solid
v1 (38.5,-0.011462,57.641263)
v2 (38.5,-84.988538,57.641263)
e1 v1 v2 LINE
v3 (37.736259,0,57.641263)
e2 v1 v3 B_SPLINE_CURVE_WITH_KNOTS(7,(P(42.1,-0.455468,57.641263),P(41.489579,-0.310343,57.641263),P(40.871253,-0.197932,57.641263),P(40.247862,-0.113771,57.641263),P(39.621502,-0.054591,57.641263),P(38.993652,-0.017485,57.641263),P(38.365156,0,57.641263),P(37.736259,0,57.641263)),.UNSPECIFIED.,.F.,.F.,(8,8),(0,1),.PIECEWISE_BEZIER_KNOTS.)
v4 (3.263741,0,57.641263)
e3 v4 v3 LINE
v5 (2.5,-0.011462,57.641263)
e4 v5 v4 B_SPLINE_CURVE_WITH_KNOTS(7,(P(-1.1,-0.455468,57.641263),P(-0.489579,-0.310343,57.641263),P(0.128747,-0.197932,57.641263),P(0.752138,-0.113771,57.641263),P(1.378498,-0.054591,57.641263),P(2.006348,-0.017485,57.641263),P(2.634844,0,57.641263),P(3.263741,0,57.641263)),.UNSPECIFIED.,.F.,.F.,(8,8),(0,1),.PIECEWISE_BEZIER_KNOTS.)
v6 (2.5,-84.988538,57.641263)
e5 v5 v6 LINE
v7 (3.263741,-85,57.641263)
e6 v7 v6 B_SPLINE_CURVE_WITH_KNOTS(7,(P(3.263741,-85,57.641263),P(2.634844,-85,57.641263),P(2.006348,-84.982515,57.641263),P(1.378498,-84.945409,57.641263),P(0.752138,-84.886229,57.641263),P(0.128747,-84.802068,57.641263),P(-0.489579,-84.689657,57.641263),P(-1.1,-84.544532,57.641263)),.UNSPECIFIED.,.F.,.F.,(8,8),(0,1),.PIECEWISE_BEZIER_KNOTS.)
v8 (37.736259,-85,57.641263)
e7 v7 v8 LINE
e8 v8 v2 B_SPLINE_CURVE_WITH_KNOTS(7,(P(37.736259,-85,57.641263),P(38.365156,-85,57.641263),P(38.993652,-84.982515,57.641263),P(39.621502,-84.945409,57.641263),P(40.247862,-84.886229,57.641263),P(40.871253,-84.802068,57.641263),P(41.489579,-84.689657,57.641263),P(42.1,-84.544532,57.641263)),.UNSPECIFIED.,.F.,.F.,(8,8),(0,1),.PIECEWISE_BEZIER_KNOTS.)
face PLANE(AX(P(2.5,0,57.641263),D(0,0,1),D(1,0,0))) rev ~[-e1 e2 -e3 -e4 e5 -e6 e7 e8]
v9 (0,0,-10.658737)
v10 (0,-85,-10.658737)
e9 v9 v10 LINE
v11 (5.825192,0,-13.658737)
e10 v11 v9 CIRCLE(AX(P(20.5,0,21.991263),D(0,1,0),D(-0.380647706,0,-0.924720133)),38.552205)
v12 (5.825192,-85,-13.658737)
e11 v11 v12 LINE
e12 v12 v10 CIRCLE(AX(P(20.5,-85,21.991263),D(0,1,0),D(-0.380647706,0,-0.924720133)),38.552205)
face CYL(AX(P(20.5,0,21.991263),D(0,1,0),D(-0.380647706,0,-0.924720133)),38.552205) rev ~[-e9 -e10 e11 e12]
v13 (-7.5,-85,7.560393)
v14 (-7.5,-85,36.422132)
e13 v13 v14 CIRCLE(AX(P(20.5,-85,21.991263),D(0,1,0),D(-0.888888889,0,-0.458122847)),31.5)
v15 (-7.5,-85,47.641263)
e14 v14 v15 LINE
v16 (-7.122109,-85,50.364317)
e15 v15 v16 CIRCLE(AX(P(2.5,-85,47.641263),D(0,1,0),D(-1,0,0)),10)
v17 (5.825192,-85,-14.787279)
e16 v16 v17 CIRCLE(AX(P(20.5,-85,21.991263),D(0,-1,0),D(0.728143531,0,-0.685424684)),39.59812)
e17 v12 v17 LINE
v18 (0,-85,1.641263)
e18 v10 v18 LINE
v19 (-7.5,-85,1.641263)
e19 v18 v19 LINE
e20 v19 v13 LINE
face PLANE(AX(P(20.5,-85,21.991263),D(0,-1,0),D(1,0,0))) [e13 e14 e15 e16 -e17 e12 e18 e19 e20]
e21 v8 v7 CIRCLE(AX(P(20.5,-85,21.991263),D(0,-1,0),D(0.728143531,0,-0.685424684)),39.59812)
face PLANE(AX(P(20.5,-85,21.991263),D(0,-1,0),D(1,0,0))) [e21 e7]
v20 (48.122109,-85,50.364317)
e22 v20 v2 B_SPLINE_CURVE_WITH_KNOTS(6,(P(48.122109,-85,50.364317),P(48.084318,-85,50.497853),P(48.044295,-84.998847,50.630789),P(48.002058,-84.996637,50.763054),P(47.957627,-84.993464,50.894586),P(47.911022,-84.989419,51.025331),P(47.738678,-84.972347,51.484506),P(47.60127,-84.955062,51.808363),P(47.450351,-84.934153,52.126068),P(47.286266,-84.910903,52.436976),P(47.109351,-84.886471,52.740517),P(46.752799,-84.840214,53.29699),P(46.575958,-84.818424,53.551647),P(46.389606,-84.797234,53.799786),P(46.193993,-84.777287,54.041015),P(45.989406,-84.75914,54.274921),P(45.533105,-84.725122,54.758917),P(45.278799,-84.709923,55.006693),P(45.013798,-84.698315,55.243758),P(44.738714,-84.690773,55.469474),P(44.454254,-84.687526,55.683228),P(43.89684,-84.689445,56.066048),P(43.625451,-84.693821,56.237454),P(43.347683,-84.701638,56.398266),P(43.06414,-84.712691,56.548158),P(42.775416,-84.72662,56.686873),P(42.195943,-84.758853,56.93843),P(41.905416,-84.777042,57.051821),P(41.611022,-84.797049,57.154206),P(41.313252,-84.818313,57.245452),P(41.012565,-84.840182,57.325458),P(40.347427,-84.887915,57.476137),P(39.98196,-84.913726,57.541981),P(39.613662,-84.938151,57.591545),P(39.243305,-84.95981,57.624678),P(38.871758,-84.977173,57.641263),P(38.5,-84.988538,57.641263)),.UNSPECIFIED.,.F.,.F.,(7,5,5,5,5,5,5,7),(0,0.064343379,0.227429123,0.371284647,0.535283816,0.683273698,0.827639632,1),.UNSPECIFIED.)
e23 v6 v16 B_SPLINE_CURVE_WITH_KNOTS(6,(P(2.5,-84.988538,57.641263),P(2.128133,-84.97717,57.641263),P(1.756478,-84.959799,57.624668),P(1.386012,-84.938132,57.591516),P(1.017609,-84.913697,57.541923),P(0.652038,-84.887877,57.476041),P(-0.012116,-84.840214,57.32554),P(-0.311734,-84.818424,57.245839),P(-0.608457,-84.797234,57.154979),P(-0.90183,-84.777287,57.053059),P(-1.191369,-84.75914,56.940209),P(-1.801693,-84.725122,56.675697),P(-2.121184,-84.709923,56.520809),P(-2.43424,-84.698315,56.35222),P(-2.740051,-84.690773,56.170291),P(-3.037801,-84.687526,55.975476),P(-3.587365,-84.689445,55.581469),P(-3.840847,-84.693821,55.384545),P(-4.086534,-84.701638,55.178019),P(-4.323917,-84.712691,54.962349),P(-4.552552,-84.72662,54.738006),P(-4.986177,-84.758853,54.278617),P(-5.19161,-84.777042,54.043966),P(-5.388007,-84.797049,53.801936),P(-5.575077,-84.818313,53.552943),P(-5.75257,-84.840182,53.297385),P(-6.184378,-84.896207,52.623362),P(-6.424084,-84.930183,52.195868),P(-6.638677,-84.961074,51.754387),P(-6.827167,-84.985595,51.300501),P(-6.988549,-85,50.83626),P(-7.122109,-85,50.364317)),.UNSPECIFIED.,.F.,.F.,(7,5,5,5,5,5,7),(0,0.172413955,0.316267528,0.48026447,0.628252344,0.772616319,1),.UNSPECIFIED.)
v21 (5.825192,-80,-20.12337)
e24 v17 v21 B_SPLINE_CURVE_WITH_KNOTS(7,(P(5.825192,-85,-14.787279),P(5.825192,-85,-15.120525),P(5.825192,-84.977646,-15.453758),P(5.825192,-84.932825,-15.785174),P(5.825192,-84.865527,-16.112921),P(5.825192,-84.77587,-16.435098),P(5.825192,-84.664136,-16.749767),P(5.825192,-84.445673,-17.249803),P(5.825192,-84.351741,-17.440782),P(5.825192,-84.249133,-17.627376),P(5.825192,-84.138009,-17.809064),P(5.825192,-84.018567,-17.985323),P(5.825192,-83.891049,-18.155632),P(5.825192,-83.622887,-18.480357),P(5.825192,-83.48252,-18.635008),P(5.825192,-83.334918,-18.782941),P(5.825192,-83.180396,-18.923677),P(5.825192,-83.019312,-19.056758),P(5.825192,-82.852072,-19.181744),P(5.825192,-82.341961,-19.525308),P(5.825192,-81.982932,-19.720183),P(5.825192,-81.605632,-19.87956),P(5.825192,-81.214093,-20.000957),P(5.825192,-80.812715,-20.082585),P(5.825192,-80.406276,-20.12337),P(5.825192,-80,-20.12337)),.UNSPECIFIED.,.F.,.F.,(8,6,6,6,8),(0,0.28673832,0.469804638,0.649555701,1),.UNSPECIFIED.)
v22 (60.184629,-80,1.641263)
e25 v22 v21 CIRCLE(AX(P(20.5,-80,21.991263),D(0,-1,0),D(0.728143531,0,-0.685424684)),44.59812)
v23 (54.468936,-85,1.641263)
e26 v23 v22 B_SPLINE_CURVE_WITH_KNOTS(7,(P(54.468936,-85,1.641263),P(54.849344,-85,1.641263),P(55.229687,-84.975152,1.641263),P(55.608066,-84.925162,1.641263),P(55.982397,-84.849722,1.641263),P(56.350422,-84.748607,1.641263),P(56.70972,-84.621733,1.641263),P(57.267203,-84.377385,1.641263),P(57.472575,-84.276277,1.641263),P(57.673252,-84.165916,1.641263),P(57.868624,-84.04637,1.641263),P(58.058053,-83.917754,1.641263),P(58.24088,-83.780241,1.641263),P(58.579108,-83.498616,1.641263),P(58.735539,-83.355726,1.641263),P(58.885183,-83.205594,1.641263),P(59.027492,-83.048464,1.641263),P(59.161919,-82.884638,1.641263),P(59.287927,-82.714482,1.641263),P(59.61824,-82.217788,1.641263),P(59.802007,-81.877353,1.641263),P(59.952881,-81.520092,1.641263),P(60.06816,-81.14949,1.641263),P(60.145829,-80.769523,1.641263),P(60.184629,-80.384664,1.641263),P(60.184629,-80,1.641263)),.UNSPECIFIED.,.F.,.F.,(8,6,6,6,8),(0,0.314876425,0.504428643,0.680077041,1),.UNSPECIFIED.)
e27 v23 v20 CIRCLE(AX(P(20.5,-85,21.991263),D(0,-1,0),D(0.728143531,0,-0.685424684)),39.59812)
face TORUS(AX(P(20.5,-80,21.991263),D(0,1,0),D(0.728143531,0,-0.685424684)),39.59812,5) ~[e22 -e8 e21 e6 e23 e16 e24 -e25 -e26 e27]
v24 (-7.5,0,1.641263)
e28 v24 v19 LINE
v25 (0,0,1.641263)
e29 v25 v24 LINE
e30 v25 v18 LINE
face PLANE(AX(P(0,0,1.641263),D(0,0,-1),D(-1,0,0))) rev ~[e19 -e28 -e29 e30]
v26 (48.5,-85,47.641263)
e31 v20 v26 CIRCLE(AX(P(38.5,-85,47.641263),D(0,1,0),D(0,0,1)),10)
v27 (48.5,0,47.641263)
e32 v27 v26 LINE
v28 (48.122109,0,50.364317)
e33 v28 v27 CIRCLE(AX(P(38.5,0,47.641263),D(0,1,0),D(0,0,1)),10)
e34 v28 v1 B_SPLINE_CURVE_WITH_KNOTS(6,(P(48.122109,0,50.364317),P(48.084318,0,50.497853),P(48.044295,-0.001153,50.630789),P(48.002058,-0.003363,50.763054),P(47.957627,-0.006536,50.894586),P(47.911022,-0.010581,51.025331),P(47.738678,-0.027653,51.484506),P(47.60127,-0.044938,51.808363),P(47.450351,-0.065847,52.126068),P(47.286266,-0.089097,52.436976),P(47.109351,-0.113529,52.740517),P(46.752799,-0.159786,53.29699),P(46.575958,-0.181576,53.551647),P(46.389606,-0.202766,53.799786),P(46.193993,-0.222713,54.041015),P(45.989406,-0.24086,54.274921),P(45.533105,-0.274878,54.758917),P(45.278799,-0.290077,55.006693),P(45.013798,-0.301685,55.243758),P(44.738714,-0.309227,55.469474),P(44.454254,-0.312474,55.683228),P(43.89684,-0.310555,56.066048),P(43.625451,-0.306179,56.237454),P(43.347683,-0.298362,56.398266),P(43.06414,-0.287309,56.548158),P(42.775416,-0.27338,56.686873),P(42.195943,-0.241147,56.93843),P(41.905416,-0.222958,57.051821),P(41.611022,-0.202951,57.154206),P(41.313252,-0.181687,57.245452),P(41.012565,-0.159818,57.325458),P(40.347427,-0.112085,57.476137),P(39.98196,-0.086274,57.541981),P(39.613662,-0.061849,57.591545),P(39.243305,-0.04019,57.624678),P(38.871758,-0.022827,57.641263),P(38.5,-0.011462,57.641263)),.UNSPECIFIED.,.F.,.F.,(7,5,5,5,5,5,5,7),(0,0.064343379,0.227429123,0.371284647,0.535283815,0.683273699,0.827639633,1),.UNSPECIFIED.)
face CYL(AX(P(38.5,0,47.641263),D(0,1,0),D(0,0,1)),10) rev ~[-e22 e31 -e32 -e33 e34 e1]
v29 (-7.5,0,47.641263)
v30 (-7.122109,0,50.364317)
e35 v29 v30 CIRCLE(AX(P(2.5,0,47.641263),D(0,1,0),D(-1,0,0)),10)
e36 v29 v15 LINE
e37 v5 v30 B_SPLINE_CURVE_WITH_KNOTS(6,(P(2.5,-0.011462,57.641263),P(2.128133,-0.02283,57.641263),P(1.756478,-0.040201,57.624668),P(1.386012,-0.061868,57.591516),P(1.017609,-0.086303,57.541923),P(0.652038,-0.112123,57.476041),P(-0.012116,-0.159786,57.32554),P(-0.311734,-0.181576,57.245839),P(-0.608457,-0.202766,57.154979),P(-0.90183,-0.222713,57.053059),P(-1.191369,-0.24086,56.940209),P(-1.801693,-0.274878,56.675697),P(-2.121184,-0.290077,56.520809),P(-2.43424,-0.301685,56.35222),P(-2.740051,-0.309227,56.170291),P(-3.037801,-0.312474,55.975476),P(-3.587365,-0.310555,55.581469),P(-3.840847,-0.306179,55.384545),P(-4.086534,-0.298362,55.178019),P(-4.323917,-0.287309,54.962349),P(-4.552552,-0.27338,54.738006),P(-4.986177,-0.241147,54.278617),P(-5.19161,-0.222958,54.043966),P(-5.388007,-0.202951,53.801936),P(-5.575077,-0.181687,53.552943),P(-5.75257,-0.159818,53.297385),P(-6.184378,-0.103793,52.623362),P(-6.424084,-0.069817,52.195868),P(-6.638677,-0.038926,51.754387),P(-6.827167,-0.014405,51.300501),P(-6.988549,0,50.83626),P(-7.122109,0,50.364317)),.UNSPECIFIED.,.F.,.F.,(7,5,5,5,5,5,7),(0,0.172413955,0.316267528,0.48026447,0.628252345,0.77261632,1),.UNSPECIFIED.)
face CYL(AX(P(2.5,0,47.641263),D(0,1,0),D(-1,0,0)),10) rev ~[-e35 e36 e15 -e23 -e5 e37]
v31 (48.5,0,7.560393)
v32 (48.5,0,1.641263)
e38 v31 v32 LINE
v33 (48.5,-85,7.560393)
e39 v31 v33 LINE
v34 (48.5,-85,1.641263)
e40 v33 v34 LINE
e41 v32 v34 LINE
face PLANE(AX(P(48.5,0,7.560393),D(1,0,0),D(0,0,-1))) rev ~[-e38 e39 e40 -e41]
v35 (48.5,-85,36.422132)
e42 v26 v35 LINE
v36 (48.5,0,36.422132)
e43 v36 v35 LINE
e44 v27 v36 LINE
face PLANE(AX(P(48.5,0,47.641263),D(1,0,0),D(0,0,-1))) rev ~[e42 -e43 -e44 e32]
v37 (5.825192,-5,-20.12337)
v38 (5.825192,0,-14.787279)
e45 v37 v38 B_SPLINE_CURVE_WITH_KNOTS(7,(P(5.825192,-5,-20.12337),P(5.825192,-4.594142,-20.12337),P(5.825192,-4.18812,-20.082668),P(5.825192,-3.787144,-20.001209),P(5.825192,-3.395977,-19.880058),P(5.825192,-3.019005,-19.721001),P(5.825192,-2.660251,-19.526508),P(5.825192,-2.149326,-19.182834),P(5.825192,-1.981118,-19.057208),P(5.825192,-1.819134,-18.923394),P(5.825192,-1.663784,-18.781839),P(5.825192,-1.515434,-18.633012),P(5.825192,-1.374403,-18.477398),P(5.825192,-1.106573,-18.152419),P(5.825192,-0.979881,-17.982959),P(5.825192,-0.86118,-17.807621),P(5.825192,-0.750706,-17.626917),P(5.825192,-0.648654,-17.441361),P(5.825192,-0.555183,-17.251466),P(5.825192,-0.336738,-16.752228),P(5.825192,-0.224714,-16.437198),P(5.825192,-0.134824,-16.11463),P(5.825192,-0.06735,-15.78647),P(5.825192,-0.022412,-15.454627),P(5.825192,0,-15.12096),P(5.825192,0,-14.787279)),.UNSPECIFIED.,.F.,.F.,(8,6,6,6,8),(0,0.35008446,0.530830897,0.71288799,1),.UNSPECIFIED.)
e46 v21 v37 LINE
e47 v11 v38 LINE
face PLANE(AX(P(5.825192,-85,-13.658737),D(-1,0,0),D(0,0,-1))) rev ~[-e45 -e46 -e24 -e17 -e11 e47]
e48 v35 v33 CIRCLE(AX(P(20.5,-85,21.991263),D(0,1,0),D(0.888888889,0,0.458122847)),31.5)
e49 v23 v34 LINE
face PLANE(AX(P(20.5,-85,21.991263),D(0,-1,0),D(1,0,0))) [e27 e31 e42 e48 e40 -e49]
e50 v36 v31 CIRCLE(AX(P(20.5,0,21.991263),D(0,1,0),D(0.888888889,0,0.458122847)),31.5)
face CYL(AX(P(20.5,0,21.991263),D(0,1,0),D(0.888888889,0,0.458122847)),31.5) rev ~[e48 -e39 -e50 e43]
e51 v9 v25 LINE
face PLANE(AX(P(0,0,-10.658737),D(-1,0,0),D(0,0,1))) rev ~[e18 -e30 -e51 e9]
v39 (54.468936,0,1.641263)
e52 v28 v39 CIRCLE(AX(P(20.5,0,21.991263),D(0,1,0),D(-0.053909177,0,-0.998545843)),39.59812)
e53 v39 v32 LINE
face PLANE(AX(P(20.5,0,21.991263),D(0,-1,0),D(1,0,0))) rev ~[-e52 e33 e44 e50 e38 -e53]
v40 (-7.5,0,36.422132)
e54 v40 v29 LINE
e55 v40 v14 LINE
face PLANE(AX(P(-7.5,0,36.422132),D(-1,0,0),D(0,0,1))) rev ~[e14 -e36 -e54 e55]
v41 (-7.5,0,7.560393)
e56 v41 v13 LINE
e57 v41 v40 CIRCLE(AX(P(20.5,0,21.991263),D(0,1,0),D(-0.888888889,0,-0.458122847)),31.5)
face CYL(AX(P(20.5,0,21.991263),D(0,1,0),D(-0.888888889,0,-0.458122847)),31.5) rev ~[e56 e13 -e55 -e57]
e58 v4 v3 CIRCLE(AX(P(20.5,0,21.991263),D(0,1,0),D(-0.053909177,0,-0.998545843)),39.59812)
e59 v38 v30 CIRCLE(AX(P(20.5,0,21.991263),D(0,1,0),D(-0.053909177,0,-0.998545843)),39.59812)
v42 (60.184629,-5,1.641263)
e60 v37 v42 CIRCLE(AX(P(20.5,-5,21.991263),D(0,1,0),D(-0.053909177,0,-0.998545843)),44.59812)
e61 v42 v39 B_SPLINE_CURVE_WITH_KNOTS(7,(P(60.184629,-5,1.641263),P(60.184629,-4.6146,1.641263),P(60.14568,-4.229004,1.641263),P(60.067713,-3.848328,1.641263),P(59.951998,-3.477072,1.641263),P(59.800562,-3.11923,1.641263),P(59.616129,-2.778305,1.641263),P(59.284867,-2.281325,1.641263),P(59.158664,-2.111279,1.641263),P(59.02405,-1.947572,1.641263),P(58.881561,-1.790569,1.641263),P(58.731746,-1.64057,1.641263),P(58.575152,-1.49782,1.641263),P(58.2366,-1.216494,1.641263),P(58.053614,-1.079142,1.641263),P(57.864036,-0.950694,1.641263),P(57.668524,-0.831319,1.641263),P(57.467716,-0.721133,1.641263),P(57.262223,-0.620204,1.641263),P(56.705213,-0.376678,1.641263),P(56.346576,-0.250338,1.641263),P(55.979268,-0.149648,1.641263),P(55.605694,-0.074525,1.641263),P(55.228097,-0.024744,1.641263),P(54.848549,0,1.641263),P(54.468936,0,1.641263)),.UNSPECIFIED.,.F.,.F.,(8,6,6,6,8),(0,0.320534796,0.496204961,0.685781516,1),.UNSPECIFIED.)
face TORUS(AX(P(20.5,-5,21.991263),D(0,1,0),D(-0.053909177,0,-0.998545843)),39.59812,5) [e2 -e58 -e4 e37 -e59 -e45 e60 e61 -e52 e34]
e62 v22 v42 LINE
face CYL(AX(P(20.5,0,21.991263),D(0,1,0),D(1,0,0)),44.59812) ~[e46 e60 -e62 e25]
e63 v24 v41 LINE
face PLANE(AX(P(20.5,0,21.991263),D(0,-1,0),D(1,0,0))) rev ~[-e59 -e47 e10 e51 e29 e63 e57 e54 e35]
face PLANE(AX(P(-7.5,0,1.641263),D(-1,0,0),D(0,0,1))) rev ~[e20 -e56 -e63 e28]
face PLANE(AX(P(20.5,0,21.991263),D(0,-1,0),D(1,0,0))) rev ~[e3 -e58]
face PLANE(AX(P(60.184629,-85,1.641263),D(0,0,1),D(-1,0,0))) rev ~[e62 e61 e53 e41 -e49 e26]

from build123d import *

# Parameters (mm, degrees)
F0_R        = 44.59812
F1_DEPTH    = 85
F3_DEPTH    = 85.001
F4_T2_ANGLE = 310.1787489512
F4_T4_ANGLE = 310.1787489512


# Not quite as in the source:
# - a fillet or chamfer that OpenCascade refuses, or shapes differently, is made with other operations: its cross-section is extruded or revolved along the edge and cut away or added


with BuildPart() as f1:
    # F0 (on Front) → F1 (new body)
    with BuildSketch(Plane.XZ):
        with Locations((20.5, 21.991262728)):
            Circle(F0_R)
        with BuildLine():
            ThreePointArc((62.0981215365, 21.991262728), (57.0788738932, 2.1824338865), (43.2323802204, -12.8461109515))
            ThreePointArc((43.2323802204, -12.8461109515), (-16.0788738932, 41.8000915695), (62.0981215365, 21.991262728))
        make_face(mode=Mode.SUBTRACT)
        with BuildLine():
            ThreePointArc((62.0981215365, 21.991262728), (-16.0788738932, 41.8000915695), (43.2323802204, -12.8461109515))
            ThreePointArc((43.2323802204, -12.8461109515), (57.0788738932, 2.1824338865), (62.0981215365, 21.991262728))
        make_face()
        with BuildLine():
            Line((48.5, 7.5603930383), (48.5, 1.641262728))
            Line((48.5, 1.641262728), (45.5, 1.641262728))
            Line((45.5, 1.641262728), (45.5, -8.658737272))
            ThreePointArc((45.5, -8.658737272), (44.896697687, -11.0397138467), (43.2323802204, -12.8461109515))
            ThreePointArc((43.2323802204, -12.8461109515), (41.9253300675, -13.4512767031), (40.5, -13.658737272))
            Line((40.5, -13.658737272), (5.8251916537, -13.658737272))
            ThreePointArc((5.8251916537, -13.658737272), (2.8487454964, -12.2827174093), (0, -10.658737272))
            Line((0, -10.658737272), (0, 1.641262728))
            Line((0, 1.641262728), (-7.5, 1.641262728))
            Line((-7.5, 1.641262728), (-7.5, 7.5603930383))
            ThreePointArc((-7.5, 7.5603930383), (-11, 21.991262728), (-7.5, 36.4221324176))
            Line((-7.5, 36.4221324176), (-7.5, 40.641262728))
            Line((-7.5, 40.641262728), (-7.5, 45.641262728))
            Line((-7.5, 45.641262728), (-7.5, 47.641262728))
            ThreePointArc((-7.5, 47.641262728), (-4.5710678119, 54.7123305398), (2.5, 57.641262728))
            Line((2.5, 57.641262728), (38.5, 57.641262728))
            ThreePointArc((38.5, 57.641262728), (45.5710678119, 54.7123305398), (48.5, 47.641262728))
            Line((48.5, 47.641262728), (48.5, 45.641262728))
            Line((48.5, 45.641262728), (48.5, 40.641262728))
            Line((48.5, 40.641262728), (48.5, 36.4221324176))
            ThreePointArc((48.5, 36.4221324176), (52, 21.991262728), (48.5, 7.5603930383))
        make_face(mode=Mode.SUBTRACT)
    extrude(amount=F1_DEPTH)

    # F2 (on face) → F3 (cut, through all)
    with BuildSketch(Plane.XZ.offset(85)):
        with BuildLine():
            Line((5.8251916537, -13.658737272), (5.8251916537, -20.1233702104))
            ThreePointArc((5.8251916537, -20.1233702104), (37.0770201947, -19.4115718247), (60.1846293612, 1.641262728))
            Line((60.1846293612, 1.641262728), (48.5, 1.641262728))
            Line((48.5, 1.641262728), (45.5, 1.641262728))
            Line((45.5, 1.641262728), (45.5, -8.658737272))
            ThreePointArc((45.5, -8.658737272), (44.0355339059, -12.194271178), (40.5, -13.658737272))
            Line((40.5, -13.658737272), (5.8251916537, -13.658737272))
        make_face()
    extrude(amount=-F3_DEPTH, mode=Mode.SUBTRACT)

    # F4: fillet of radius 5 on 2 edges, made by hand

    # F4_s1 → F4_t2 (revolve, cut)
    with BuildSketch(Plane(origin=(20.6066088897, 0, 21.8909083866), x_dir=(0, 1, 0), z_dir=(-0.6854246842, 0, -0.7281435314))):
        with BuildLine():
            ThreePointArc((-85, 39.4517080838), (-83.5355339059, 42.9872419898), (-80, 44.4517080838))
            Line((-80, 44.4517080838), (-85, 44.4517080838))
            Line((-85, 44.4517080838), (-85, 39.4517080838))
        make_face()
    revolve(axis=Axis((20.5, -85, 21.991262728), (0, -1, 0)), revolution_arc=F4_T2_ANGLE, mode=Mode.SUBTRACT)

    # F4_s3 → F4_t4 (revolve, cut)
    with BuildSketch(Plane(origin=(19.2566159931, 0, -1.0396200852), x_dir=(0, 1, 0), z_dir=(0.998545843, 0, -0.0539091767))):
        with BuildLine():
            ThreePointArc((-5, -21.533697897), (-1.4644660941, -20.0692318029), (0, -16.533697897))
            Line((0, -16.533697897), (0, -21.533697897))
            Line((0, -21.533697897), (-5, -21.533697897))
        make_face()
    revolve(axis=Axis((20.5, 0, 21.991262728), (0, 1, 0)), revolution_arc=F4_T4_ANGLE, mode=Mode.SUBTRACT)


solid = f1.part
